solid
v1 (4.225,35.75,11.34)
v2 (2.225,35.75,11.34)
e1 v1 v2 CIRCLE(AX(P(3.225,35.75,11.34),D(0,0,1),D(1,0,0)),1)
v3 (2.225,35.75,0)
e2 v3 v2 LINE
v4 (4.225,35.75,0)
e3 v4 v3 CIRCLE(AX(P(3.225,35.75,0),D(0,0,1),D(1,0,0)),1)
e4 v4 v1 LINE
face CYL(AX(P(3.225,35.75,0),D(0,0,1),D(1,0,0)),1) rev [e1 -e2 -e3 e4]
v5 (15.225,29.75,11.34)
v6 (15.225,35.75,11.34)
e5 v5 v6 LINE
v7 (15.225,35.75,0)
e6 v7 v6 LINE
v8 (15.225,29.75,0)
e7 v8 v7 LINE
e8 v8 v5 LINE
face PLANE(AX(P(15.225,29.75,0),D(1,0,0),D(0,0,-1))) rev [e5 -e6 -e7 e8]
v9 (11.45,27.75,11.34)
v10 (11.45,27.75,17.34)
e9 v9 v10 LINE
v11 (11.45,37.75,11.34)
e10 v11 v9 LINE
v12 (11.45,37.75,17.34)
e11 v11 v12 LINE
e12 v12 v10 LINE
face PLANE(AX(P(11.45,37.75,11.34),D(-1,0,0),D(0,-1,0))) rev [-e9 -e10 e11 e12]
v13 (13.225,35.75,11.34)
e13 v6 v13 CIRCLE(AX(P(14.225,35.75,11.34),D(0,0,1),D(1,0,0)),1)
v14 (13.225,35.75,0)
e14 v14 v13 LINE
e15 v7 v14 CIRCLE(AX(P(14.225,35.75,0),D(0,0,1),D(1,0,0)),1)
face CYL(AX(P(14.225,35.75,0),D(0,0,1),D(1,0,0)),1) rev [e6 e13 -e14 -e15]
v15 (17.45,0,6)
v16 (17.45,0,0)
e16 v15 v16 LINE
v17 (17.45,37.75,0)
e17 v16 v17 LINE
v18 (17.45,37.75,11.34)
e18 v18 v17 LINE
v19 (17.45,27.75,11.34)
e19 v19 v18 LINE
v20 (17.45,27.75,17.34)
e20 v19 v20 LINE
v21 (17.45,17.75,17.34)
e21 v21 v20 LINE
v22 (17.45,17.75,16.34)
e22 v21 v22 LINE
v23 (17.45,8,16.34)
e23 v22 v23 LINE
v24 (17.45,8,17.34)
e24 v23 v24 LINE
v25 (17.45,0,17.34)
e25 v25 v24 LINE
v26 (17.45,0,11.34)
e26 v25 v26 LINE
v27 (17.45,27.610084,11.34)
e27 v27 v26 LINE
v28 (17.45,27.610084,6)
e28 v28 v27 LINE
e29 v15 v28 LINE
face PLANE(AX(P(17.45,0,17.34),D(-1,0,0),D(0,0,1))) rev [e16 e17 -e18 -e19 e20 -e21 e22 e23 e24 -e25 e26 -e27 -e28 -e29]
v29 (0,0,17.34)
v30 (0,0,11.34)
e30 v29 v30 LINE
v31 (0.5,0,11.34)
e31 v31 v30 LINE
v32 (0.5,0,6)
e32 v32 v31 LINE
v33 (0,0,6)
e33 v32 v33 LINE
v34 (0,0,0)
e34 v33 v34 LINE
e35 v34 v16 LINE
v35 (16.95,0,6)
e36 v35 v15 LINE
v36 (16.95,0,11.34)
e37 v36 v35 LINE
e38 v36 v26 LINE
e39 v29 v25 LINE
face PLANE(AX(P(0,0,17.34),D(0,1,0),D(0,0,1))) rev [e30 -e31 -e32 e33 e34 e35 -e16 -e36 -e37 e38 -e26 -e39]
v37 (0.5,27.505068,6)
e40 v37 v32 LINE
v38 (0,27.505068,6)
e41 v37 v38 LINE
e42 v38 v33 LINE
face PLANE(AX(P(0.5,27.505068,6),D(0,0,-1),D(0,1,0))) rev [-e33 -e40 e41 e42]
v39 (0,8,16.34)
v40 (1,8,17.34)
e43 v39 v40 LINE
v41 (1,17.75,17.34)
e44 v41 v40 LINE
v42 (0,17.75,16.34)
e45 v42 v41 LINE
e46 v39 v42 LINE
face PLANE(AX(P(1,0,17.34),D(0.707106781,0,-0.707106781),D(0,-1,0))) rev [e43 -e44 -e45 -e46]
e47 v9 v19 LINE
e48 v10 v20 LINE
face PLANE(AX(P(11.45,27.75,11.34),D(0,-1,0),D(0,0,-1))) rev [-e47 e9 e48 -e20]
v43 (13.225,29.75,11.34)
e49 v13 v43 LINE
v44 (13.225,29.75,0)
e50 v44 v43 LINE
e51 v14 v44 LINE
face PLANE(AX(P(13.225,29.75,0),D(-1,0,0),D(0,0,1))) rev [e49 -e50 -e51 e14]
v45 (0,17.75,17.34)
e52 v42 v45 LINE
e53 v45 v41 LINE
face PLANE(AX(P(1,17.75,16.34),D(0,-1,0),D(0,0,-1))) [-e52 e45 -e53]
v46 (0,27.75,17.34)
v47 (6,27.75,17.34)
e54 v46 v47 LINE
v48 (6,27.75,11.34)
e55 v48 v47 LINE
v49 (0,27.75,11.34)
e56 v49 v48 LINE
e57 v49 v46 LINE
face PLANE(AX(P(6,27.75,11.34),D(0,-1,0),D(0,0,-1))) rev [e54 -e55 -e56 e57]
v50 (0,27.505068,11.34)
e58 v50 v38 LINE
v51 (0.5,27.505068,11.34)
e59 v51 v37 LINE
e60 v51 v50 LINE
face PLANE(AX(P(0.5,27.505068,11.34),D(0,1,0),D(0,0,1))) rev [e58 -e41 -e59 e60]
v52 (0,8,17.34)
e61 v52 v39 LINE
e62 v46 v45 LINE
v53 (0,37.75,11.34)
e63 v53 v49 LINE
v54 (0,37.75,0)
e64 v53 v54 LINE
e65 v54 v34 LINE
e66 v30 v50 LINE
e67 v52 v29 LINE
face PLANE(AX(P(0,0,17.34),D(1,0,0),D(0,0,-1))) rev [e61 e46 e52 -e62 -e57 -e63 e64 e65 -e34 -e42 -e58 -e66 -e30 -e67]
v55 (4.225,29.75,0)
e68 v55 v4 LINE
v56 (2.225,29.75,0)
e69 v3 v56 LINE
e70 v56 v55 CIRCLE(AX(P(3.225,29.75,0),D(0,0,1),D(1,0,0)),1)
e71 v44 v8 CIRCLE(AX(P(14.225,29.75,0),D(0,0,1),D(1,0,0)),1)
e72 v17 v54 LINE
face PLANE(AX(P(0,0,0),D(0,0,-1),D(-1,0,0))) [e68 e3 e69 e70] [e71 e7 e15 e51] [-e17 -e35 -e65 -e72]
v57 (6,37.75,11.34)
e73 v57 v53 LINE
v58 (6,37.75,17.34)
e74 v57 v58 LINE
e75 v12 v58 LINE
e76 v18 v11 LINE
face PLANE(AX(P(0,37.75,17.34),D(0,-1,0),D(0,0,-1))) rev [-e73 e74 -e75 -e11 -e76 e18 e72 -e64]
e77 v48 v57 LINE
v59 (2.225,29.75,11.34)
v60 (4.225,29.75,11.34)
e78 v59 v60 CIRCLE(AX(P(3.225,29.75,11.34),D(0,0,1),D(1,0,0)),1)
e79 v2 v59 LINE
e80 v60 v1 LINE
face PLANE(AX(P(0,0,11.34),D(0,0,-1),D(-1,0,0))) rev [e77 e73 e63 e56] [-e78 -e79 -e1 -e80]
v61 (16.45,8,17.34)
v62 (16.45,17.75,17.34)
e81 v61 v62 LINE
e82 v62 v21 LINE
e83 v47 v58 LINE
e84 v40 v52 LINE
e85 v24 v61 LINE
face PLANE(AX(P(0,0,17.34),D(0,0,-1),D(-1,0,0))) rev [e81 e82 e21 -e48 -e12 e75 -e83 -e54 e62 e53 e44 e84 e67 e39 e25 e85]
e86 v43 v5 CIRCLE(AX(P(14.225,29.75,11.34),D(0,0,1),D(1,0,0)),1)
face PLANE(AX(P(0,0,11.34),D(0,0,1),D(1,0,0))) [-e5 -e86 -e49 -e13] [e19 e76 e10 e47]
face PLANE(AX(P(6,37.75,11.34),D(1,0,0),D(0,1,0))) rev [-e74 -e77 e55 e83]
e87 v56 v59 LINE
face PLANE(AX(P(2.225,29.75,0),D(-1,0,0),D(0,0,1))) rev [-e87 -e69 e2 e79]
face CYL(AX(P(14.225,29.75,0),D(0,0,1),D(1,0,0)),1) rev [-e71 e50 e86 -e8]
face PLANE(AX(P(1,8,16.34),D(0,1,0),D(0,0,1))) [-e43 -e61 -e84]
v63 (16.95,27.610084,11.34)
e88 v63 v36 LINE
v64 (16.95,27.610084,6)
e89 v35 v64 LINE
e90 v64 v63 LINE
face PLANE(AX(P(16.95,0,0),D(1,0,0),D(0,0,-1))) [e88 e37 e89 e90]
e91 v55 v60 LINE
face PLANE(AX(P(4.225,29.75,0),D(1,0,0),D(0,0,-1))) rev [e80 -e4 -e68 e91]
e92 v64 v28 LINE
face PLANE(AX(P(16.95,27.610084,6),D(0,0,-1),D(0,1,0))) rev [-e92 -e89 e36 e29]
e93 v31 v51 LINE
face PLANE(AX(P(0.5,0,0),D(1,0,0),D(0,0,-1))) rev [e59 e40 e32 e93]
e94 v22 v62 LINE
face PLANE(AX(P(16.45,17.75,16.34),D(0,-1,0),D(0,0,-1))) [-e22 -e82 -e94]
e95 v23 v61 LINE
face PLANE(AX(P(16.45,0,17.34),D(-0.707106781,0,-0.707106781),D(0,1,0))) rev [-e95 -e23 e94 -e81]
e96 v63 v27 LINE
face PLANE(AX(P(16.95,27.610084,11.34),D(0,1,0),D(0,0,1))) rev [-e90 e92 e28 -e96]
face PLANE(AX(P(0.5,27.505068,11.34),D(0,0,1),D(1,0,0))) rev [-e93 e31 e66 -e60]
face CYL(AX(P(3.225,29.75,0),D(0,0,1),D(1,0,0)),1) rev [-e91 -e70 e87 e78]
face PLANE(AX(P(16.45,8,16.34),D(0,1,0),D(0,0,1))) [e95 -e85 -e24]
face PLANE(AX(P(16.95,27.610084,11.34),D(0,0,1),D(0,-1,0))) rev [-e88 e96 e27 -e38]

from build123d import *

# Parameters (mm, degrees)
SKETCH1_W                      = 17.45
SKETCH1_H                      = 37.75
PROFILEBOSS_EXTRUDE1_DEPTH     = 17.34
TOPINDENTSSKETCH2_W            = 6
TOPINDENTSSKETCH2_H            = 10
TOPINDENTCUT_EXTRUDE1_DEPTH    = 6
MOUNTSLOTCUTCUT_EXTRUDE2_DEPTH = 44.106386998
FRONTEDGECHAMFER1_START        = 8
FRONTEDGECHAMFER1_DEPTH        = 9.75
RIGHTSLOTSKETCH4_W             = 5.34
RIGHTSLOTSKETCH4_H             = 27.610084113
RIGHTSLOTCUT_EXTRUDE5_DEPTH    = 0.5
LEFTSLOTSKETCH5_W              = 5.34
LEFTSLOTSKETCH5_H              = 27.50506845
CUT_EXTRUDE8_DEPTH             = 0.5


with BuildPart() as part:
    # Sketch1 → ProfileBoss-Extrude1 (new body)
    with BuildSketch(Plane.XY):
        with Locations((8.725, 18.875)):
            Rectangle(SKETCH1_W, SKETCH1_H)
    extrude(amount=PROFILEBOSS_EXTRUDE1_DEPTH)

    # TopIndentsSketch2 → TopIndentCut-Extrude1 (cut)
    with BuildSketch(Plane.XY.offset(17.34)):
        with Locations((14.45, 32.75)):
            Rectangle(TOPINDENTSSKETCH2_W, TOPINDENTSSKETCH2_H)
        with Locations((3, 32.75)):
            Rectangle(TOPINDENTSSKETCH2_W, TOPINDENTSSKETCH2_H)
    extrude(amount=-TOPINDENTCUT_EXTRUDE1_DEPTH, mode=Mode.SUBTRACT)

    # Sketch3 → MountSlotCutCut-Extrude2 (cut, through all)
    with BuildSketch(Plane.XY.offset(11.34)):
        with BuildLine():
            Line((13.225, 29.75), (13.225, 35.75))
            ThreePointArc((13.225, 35.75), (14.225, 36.75), (15.225, 35.75))
            Line((15.225, 35.75), (15.225, 29.75))
            ThreePointArc((15.225, 29.75), (14.225, 28.75), (13.225, 29.75))
        make_face()
        with BuildLine():
            Line((2.225, 29.75), (2.225, 35.75))
            ThreePointArc((2.225, 35.75), (3.225, 36.75), (4.225, 35.75))
            Line((4.225, 35.75), (4.225, 29.75))
            ThreePointArc((4.225, 29.75), (3.225, 28.75), (2.225, 29.75))
        make_face()
    extrude(amount=-MOUNTSLOTCUTCUT_EXTRUDE2_DEPTH, mode=Mode.SUBTRACT)

    # FrontEdgeChamfer1: read off the stored shape, not the designer's step
    # FrontEdgeChamfer1 outline → FrontEdgeChamfer1 (cut)
    with BuildSketch(Plane(origin=(0, 0, 0), x_dir=(1, 0, 0), z_dir=(0, 1, 0)).offset(FRONTEDGECHAMFER1_START)):
        Polygon((17.45, -17.34), (17.45, -16.34), (16.45, -17.34), align=None)
        Polygon((0, -17.34), (1, -17.34), (0, -16.34), align=None)
    extrude(amount=FRONTEDGECHAMFER1_DEPTH, mode=Mode.SUBTRACT)

    # RightSlotSketch4 → RightSlotCut-Extrude5 (cut)
    with BuildSketch(Plane(origin=(17.45, 0, 0), x_dir=(0, 0, -1), z_dir=(1, 0, 0))):
        with Locations((-8.67, 13.805042057)):
            Rectangle(RIGHTSLOTSKETCH4_W, RIGHTSLOTSKETCH4_H)
    extrude(amount=-RIGHTSLOTCUT_EXTRUDE5_DEPTH, mode=Mode.SUBTRACT)

    # LeftSlotSketch5 → Cut-Extrude8 (cut)
    with BuildSketch(Plane.ZY):
        with Locations((8.67, 13.752534225)):
            Rectangle(LEFTSLOTSKETCH5_W, LEFTSLOTSKETCH5_H)
    extrude(amount=-CUT_EXTRUDE8_DEPTH, mode=Mode.SUBTRACT)


solid = part.part
